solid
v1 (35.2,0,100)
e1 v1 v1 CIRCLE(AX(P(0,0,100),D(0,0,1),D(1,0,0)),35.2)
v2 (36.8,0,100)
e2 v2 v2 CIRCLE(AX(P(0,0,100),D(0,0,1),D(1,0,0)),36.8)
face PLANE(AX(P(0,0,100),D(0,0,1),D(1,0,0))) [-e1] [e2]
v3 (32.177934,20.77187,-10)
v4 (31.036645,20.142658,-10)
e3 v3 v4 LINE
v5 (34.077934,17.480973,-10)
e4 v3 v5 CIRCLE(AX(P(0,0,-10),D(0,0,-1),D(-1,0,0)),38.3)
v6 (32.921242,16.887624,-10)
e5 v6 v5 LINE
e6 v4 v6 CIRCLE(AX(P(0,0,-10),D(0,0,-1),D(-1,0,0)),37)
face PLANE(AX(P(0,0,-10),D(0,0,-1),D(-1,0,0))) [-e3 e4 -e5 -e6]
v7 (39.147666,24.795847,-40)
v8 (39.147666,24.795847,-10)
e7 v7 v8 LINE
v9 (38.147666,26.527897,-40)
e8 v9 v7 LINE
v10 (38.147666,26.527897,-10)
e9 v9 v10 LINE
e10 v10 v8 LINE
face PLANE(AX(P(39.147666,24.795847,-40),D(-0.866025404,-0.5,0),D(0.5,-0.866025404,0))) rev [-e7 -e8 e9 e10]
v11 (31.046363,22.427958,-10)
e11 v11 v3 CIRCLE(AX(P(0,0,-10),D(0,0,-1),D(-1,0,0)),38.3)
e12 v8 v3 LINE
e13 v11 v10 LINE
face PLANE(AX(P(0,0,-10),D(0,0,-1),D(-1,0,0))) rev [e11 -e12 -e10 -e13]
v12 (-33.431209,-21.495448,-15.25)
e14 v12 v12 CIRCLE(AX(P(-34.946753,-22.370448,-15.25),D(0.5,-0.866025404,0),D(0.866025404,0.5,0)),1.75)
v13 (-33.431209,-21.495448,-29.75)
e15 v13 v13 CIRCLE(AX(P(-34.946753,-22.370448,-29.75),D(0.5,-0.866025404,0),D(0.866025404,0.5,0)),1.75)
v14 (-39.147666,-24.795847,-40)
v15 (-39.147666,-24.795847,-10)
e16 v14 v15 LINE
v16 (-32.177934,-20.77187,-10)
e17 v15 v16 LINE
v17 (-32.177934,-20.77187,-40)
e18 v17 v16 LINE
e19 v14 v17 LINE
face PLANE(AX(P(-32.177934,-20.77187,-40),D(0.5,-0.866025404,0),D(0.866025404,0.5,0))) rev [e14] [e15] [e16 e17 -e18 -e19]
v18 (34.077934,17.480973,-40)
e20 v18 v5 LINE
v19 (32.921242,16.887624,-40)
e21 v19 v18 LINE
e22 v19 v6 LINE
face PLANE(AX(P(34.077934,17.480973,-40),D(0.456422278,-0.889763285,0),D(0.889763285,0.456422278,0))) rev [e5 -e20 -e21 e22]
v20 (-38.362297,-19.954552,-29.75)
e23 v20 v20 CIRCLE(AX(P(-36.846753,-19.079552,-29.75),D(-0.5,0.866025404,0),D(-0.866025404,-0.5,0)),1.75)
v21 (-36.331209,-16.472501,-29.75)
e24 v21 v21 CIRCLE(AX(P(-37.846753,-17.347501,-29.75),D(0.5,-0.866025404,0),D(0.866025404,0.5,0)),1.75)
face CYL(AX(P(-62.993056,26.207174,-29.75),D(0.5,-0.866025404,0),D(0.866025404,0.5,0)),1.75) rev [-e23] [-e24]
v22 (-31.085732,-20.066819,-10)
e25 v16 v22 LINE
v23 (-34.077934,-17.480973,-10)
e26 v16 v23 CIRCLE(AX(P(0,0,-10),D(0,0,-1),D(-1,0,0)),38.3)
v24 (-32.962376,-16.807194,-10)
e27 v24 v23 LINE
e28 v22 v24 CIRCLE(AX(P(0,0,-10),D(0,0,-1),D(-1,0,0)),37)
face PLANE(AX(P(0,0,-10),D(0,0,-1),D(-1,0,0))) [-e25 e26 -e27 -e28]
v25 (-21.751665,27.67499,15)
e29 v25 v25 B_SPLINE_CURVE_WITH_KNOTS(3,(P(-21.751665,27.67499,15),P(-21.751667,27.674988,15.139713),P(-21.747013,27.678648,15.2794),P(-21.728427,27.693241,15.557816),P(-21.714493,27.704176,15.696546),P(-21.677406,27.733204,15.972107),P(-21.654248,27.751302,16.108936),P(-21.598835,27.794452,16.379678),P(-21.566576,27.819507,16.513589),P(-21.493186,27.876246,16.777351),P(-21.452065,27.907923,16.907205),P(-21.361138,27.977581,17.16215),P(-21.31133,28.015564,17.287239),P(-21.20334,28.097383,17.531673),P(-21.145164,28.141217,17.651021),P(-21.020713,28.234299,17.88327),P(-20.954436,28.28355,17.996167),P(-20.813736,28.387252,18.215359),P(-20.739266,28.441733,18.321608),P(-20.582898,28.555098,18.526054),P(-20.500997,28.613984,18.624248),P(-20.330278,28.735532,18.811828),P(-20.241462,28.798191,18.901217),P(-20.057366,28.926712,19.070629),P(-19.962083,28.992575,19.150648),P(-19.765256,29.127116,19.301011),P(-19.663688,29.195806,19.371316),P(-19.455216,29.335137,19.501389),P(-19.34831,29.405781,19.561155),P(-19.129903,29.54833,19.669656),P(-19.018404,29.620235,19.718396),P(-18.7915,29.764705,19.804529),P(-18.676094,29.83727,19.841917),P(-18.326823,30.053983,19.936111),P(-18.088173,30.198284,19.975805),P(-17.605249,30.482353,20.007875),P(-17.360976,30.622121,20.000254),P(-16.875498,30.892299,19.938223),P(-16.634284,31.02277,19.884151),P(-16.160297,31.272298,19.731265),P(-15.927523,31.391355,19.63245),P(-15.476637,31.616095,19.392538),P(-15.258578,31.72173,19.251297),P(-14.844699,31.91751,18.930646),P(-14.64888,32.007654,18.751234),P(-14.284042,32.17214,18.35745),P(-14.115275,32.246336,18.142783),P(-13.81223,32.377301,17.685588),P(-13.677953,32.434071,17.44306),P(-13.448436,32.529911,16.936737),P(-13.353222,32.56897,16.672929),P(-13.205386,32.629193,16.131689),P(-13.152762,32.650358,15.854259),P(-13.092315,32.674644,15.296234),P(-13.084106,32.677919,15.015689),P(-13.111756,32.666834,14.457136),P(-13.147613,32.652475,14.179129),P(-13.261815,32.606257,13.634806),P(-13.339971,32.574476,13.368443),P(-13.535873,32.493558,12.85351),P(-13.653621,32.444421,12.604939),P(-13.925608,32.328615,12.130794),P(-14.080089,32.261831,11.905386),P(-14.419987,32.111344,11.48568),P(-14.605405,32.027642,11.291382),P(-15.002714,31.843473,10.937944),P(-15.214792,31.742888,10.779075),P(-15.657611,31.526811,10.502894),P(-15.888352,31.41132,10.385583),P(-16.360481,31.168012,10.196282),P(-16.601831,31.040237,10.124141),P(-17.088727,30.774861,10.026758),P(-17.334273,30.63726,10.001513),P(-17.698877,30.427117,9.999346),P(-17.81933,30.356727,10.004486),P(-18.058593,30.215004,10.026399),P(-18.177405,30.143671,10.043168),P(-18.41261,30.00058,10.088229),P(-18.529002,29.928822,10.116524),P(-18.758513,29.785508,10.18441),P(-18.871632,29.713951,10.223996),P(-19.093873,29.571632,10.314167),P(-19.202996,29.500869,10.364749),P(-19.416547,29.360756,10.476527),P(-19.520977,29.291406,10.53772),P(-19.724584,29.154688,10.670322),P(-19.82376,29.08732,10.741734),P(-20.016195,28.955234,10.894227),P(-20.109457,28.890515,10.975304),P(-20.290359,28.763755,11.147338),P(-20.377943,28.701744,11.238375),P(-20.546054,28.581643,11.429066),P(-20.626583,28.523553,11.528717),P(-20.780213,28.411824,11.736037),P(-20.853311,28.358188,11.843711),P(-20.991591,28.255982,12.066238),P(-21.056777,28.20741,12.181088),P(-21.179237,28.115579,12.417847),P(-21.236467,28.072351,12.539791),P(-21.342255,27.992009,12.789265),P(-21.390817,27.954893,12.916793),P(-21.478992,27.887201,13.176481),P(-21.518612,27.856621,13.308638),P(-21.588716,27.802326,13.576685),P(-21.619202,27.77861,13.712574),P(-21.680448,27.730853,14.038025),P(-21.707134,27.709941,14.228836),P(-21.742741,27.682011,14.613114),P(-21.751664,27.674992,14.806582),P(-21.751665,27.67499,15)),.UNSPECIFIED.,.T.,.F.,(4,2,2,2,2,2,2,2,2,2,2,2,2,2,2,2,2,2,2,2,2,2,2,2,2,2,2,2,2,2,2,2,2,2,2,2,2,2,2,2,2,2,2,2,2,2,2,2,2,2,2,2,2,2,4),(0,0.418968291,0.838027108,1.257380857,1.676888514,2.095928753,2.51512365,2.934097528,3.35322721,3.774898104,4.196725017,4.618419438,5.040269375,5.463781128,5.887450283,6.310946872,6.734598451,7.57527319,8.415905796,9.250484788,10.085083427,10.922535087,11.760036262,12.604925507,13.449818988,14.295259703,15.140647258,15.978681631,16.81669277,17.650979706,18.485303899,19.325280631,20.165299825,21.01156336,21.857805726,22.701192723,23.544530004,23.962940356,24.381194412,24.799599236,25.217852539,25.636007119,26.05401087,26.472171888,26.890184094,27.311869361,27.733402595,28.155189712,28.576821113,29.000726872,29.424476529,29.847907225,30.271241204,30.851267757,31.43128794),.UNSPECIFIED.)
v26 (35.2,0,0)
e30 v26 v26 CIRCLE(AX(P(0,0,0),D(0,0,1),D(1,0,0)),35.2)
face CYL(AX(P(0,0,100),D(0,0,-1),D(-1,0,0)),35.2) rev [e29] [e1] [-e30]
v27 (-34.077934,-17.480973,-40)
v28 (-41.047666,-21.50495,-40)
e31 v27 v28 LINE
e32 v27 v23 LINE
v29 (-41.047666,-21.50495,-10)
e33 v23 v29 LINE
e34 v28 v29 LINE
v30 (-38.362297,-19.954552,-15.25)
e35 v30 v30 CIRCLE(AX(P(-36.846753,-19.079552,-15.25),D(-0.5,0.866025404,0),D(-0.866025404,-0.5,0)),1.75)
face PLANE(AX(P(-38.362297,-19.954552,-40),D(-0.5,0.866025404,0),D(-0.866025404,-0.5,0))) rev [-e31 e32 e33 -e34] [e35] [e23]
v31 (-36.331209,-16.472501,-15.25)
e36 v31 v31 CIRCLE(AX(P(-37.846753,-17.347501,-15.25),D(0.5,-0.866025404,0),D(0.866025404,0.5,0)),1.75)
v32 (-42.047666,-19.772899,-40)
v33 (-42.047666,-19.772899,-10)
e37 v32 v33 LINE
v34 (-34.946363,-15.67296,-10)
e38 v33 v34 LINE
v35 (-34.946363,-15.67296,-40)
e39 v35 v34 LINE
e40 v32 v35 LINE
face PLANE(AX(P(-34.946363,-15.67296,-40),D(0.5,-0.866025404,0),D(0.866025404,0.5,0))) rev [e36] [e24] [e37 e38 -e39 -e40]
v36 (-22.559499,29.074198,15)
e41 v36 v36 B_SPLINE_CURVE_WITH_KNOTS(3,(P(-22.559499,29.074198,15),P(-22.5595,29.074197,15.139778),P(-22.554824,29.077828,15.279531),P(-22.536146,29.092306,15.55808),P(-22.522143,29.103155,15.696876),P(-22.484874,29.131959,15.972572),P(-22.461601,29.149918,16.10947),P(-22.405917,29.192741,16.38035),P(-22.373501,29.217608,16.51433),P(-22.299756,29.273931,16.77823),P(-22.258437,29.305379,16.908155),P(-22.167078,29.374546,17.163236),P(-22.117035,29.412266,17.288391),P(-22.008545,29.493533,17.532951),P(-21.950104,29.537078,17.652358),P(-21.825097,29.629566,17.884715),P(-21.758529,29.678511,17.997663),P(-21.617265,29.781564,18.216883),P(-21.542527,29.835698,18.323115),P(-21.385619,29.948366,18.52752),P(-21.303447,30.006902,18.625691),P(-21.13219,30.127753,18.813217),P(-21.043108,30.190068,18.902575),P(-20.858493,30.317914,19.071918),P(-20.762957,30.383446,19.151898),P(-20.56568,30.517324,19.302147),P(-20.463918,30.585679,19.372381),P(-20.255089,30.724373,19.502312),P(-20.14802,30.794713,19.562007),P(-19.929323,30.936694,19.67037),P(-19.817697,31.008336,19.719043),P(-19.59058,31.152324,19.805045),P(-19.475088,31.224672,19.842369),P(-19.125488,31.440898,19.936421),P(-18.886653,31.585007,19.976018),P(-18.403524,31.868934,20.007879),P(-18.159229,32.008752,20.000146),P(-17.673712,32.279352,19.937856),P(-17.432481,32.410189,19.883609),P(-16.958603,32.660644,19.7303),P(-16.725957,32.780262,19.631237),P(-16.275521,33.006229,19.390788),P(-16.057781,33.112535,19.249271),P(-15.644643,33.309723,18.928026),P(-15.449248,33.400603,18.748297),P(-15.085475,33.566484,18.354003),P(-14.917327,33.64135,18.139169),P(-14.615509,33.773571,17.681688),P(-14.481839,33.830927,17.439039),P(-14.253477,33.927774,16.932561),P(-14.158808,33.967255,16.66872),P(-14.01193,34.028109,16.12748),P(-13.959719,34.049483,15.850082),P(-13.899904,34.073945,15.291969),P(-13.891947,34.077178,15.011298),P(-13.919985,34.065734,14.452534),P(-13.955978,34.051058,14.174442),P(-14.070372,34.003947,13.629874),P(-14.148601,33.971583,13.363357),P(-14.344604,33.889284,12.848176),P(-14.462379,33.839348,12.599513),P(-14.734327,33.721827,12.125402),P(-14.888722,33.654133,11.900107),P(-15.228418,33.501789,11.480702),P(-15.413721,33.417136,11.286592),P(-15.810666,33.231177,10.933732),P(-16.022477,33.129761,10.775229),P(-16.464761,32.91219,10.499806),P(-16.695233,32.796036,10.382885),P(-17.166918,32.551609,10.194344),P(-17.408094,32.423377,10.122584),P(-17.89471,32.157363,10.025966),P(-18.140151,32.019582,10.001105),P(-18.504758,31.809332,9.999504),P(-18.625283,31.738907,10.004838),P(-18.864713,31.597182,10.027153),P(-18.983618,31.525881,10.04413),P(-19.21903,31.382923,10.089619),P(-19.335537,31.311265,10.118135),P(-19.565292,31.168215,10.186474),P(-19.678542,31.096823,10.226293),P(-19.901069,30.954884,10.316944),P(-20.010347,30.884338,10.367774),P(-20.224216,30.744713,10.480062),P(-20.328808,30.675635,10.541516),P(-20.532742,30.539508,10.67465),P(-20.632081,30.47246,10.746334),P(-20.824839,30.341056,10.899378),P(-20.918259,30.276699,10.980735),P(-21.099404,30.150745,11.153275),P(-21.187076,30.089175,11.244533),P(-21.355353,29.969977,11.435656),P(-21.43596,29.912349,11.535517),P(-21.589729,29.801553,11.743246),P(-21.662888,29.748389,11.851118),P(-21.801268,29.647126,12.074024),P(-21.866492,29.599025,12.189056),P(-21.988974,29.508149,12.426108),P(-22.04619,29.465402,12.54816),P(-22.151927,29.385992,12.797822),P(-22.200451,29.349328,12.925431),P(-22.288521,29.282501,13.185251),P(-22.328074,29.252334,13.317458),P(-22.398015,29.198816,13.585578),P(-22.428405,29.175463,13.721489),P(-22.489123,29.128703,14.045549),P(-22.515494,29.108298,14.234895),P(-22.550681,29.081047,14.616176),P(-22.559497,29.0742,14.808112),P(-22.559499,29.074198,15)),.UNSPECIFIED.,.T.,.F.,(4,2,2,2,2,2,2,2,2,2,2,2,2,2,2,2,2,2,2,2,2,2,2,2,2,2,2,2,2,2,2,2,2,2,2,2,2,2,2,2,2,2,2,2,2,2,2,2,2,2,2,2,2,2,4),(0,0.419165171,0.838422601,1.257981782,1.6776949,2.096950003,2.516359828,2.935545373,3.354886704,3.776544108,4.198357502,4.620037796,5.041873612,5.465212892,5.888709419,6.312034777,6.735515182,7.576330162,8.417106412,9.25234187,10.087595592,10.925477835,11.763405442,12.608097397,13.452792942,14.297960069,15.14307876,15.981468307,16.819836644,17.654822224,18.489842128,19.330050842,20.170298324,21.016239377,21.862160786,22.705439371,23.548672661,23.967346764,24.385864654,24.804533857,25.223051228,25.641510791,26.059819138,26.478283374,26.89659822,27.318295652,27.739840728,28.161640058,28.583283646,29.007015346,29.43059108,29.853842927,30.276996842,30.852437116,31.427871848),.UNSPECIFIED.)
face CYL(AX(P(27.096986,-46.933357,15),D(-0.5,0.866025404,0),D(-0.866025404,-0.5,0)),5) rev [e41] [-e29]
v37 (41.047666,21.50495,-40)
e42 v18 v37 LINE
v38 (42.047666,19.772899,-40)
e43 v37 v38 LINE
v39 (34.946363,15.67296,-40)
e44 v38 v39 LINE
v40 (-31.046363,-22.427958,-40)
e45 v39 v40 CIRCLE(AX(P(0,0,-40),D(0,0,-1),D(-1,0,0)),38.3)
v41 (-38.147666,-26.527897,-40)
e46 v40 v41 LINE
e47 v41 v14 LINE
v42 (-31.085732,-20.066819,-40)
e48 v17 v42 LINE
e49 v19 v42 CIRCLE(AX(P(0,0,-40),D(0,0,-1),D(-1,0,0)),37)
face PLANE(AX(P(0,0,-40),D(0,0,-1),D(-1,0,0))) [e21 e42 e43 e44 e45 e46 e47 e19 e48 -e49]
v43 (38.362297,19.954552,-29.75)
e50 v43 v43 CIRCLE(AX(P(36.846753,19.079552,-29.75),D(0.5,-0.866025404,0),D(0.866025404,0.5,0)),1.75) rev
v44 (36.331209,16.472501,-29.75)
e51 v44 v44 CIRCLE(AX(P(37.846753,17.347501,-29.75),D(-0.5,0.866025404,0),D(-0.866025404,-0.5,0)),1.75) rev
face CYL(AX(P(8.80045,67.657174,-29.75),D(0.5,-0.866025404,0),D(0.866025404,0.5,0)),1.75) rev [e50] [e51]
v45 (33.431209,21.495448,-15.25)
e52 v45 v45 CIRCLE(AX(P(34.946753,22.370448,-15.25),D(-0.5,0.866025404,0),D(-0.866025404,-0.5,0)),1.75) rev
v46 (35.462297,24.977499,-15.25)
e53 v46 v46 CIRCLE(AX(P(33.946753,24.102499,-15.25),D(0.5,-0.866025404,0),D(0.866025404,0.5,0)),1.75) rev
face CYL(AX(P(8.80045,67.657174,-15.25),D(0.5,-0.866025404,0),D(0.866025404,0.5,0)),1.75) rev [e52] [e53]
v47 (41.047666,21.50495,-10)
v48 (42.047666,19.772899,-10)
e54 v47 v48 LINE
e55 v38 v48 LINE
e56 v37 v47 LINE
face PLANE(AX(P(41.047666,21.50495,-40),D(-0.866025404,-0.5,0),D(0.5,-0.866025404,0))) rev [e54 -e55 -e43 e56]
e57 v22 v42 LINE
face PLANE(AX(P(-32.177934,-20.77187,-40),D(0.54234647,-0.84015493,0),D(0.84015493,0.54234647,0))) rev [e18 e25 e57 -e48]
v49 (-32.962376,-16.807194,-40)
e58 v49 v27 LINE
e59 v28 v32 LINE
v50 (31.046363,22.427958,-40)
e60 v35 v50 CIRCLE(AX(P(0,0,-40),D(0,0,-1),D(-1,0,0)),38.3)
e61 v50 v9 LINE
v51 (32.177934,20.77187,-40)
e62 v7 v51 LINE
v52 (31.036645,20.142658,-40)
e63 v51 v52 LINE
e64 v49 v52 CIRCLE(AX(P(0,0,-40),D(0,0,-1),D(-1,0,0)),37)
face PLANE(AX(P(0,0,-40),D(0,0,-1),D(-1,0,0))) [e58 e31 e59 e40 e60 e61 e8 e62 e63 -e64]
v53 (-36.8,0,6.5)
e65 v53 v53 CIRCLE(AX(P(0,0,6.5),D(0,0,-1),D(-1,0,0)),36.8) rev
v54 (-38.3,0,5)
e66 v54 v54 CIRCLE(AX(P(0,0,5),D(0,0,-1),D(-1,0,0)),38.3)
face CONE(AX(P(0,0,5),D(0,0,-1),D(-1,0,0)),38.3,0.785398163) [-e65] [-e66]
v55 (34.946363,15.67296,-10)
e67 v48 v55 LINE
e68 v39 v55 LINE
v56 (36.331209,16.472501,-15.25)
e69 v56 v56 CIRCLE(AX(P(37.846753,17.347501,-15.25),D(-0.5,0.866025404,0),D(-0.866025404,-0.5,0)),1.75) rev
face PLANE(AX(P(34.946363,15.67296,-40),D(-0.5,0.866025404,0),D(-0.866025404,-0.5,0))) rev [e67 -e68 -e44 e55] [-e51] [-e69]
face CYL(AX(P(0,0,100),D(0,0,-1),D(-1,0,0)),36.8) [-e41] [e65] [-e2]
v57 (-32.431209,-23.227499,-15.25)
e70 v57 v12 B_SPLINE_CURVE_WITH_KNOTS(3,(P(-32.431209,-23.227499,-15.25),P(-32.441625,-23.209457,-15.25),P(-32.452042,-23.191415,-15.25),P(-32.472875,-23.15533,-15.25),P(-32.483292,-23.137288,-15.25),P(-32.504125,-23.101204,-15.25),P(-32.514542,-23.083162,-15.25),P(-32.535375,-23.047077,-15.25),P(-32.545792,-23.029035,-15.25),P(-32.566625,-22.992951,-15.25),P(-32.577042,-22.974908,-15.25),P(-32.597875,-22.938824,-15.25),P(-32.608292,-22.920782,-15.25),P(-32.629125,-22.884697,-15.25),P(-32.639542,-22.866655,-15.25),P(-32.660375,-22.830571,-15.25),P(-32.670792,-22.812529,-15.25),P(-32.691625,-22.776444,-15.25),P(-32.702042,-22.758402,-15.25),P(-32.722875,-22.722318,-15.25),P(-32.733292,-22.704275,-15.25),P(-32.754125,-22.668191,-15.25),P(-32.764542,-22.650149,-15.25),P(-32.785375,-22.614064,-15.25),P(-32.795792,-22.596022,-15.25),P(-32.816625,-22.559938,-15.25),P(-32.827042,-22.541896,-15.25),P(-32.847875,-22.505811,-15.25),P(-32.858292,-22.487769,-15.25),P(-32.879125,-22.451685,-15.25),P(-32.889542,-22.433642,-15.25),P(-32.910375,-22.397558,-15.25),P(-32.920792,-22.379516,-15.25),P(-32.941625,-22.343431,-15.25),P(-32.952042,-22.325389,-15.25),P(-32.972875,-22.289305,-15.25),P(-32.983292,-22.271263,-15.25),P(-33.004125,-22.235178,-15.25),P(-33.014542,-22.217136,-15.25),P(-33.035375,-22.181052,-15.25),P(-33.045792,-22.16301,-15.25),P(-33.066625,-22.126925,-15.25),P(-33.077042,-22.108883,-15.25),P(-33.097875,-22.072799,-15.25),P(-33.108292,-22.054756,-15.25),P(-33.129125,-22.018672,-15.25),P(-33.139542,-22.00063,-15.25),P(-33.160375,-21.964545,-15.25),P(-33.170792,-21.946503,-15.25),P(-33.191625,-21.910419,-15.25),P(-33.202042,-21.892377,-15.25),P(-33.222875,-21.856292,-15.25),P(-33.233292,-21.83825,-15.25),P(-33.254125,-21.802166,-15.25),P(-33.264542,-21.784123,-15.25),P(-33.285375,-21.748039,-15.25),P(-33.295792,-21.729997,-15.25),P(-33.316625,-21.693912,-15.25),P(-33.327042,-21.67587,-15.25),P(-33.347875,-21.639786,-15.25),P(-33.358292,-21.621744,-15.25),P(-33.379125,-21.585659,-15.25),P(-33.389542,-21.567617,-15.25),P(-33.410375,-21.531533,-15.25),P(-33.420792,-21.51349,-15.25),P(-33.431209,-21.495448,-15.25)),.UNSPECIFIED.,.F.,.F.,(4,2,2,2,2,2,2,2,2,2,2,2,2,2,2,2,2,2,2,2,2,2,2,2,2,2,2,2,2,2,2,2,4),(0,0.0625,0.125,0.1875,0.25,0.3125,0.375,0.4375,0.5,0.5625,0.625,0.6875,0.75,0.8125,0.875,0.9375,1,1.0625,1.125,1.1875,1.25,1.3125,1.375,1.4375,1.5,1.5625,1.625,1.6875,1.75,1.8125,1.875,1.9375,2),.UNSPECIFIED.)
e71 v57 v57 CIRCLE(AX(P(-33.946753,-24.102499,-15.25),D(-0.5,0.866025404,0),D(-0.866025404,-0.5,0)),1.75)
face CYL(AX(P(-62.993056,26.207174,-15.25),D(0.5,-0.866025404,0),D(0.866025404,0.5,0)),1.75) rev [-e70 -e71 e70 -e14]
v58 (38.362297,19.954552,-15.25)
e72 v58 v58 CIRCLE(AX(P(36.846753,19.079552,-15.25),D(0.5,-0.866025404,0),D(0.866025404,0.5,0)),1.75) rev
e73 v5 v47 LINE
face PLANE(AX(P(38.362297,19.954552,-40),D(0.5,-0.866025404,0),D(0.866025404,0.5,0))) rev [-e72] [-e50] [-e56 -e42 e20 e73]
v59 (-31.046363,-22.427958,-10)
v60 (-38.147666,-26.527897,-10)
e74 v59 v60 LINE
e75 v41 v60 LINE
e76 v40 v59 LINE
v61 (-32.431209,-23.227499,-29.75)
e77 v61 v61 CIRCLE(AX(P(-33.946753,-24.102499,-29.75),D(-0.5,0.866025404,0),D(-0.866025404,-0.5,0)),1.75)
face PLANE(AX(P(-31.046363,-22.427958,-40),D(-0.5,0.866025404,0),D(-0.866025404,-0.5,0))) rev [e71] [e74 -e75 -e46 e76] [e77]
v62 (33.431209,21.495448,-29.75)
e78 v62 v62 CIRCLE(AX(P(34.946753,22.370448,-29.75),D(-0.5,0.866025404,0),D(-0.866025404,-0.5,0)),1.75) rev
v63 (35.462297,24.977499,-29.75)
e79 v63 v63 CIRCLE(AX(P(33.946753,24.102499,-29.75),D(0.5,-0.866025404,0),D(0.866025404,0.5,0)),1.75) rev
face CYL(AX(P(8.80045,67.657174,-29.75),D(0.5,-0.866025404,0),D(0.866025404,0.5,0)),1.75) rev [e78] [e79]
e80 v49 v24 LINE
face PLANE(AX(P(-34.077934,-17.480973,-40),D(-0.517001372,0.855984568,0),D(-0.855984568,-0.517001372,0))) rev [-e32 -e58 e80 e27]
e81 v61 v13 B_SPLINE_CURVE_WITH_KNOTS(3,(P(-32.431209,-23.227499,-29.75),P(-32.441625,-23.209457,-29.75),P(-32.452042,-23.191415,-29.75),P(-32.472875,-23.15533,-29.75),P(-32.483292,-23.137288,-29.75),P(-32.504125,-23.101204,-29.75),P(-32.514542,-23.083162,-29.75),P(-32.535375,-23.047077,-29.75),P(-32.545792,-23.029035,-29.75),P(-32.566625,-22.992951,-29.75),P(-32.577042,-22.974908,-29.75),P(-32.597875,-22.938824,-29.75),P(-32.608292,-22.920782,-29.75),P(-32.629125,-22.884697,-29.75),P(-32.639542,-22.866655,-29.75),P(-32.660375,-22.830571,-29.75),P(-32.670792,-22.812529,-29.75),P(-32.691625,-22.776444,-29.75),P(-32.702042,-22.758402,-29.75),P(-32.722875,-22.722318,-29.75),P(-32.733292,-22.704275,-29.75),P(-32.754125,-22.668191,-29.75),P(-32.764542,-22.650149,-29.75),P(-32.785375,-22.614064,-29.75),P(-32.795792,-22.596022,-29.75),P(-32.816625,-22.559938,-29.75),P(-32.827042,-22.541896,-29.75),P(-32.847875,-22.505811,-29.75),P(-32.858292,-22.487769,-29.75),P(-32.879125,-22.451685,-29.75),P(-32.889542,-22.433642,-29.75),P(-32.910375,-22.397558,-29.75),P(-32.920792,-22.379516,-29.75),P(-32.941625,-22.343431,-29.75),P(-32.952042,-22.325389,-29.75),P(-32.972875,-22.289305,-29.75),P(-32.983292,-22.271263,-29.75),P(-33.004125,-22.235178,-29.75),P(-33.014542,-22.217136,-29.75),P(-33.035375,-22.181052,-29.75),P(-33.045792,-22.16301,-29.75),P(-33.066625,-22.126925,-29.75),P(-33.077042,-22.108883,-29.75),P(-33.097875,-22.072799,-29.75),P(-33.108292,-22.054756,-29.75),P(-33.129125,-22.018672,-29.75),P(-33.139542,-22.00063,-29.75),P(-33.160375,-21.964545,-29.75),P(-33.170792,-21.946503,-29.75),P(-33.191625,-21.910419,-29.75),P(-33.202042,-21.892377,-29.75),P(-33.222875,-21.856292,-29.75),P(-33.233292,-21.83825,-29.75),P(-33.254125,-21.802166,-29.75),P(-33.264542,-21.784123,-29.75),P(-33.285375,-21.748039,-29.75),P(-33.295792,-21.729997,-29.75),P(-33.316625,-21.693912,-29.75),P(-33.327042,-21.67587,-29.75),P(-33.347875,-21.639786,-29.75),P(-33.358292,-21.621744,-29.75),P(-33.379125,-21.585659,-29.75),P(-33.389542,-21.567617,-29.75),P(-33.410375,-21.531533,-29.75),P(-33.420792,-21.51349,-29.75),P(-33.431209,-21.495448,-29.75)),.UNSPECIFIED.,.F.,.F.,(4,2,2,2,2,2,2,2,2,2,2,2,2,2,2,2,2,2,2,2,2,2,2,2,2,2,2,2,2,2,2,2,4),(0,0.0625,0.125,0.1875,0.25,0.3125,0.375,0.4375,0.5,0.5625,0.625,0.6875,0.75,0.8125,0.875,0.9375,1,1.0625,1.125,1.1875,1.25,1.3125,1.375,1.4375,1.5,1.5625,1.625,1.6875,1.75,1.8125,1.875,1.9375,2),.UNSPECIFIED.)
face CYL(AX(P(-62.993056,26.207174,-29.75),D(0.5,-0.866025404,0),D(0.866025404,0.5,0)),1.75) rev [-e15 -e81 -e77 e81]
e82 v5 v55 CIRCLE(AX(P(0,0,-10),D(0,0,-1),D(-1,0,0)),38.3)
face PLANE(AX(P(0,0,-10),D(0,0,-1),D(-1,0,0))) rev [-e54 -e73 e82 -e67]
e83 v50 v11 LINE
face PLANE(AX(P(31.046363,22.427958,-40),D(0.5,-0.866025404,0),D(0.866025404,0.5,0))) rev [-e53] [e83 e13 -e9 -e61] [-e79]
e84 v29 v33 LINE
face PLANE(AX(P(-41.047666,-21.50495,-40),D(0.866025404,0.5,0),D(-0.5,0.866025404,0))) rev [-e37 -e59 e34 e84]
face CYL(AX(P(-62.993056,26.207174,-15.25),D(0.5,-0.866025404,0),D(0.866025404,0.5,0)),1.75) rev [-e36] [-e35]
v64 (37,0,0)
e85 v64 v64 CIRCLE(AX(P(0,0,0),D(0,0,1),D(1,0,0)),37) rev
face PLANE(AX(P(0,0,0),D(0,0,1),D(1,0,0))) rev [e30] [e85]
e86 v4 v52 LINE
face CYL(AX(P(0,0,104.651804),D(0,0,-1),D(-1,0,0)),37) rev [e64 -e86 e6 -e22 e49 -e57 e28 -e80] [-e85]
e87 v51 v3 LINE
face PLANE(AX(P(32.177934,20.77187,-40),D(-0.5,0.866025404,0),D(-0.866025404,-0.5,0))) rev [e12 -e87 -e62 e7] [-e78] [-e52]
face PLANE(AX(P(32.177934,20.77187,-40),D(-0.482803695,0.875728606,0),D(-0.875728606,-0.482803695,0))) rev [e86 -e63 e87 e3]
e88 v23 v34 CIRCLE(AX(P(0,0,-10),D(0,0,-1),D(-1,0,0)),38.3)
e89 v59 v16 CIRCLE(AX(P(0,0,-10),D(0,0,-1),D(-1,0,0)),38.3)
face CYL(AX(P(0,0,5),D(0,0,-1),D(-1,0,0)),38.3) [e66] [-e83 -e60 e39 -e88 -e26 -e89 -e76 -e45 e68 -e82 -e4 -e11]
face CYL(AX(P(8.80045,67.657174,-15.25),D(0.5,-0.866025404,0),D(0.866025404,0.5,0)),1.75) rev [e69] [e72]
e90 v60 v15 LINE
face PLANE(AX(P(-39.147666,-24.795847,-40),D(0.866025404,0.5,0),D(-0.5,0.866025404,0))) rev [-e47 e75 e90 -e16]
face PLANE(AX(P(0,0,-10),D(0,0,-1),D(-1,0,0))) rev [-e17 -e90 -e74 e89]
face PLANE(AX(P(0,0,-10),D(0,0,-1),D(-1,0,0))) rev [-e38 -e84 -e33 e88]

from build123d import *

# Parameters (mm, degrees)
SKETCH1_R                = 36.8
SKETCH1_R_2              = 35.2
BOSS_EXTRUDE1_DEPTH      = 100
BOSS_EXTRUDE2_DEPTH      = 10
BOSS_EXTRUDE2_DEPTH_BACK = 5
SKETCH2_R                = 38.3
SKETCH2_R_2              = 36.8
CHAMFER1_SIZE            = 1.5
BOSS_EXTRUDE3_START      = 30
BOSS_EXTRUDE3_DEPTH      = 30
SKETCH7_R                = 1.75
CUT_EXTRUDE1_DEPTH       = 116.043019012
CUT_EXTRUDE2_REACH       = 153.112
CUT_EXTRUDE3_REACH       = 138.3
CUT_EXTRUDE3_END_RADIUS  = 35.2
SKETCH9_R                = 5


with BuildPart() as part:
    # Sketch1 → Boss-Extrude1 (new body)
    with BuildSketch(Plane.XY):
        Circle(SKETCH1_R)
        Circle(SKETCH1_R_2, mode=Mode.SUBTRACT)
    extrude(amount=BOSS_EXTRUDE1_DEPTH)

    # Sketch2 → Boss-Extrude2 (add, two sides: drawn at the far end of the back side and taken through both)
    with BuildSketch(Plane(origin=(0, 0, 0), x_dir=(-1, 0, 0), z_dir=(0, 0, -1)).offset(-BOSS_EXTRUDE2_DEPTH_BACK)):
        Circle(SKETCH2_R)
        Circle(SKETCH2_R_2, mode=Mode.SUBTRACT)
    extrude(amount=BOSS_EXTRUDE2_DEPTH + BOSS_EXTRUDE2_DEPTH_BACK)

    # Chamfer1
    chamfer1_edges = [part.edges().sort_by_distance(p)[0] for p in [
        (-36.8, 0, 5),
    ]]
    chamfer(chamfer1_edges, length=CHAMFER1_SIZE - 0.0001)  # a hair under: the kernel refuses the full size

    # Sketch6 → Boss-Extrude3 (add)
    with BuildSketch(Plane(origin=(0, 0, -10), x_dir=(-1, 0, 0), z_dir=(0, 0, -1)).offset(BOSS_EXTRUDE3_START)):
        with BuildLine():
            Line((-31.046363436, 22.427958387), (-32.43120853, 23.227499075))
            Line((-32.43120853, 23.227499075), (-35.462297443, 24.977499075))
            Line((-35.462297443, 24.977499075), (-38.147666087, 26.527897384))
            Line((-38.147666087, 26.527897384), (-39.147666087, 24.795846576))
            Line((-39.147666087, 24.795846576), (-36.462297443, 23.245448267))
            Line((-36.462297443, 23.245448267), (-33.43120853, 21.495448267))
            Line((-33.43120853, 21.495448267), (-32.177933832, 20.771869783))
            Line((-32.177933832, 20.771869783), (-30.861043972, 20.045846576))
            ThreePointArc((-30.861043972, 20.045846576), (18.4, 31.869734859), (32.790734361, -16.703524779))
            Line((32.790734361, -16.703524779), (34.077933832, -17.480973249))
            Line((34.077933832, -17.480973249), (35.33120853, -18.204551733))
            Line((35.33120853, -18.204551733), (38.362297443, -19.954551733))
            Line((38.362297443, -19.954551733), (41.047666087, -21.504950042))
            Line((41.047666087, -21.504950042), (42.047666087, -19.772899234))
            Line((42.047666087, -19.772899234), (39.362297443, -18.222500925))
            Line((39.362297443, -18.222500925), (36.33120853, -16.472500925))
            Line((36.33120853, -16.472500925), (34.946363436, -15.672960237))
            ThreePointArc((34.946363436, -15.672960237), (19.15, 33.168772965), (-31.046363436, 22.427958387))
        make_face()
        with BuildLine():
            Line((-34.946363436, 15.672960237), (-36.33120853, 16.472500925))
            Line((-36.33120853, 16.472500925), (-39.362297443, 18.222500925))
            Line((-39.362297443, 18.222500925), (-42.047666087, 19.772899234))
            Line((-42.047666087, 19.772899234), (-41.047666087, 21.504950042))
            Line((-41.047666087, 21.504950042), (-38.362297443, 19.954551733))
            Line((-38.362297443, 19.954551733), (-35.33120853, 18.204551733))
            Line((-35.33120853, 18.204551733), (-34.077933832, 17.480973249))
            Line((-34.077933832, 17.480973249), (-32.743288904, 16.796339832))
            ThreePointArc((-32.743288904, 16.796339832), (-18.4, -31.869734859), (30.917701437, -19.958350079))
            Line((30.917701437, -19.958350079), (32.177933832, -20.771869783))
            Line((32.177933832, -20.771869783), (33.43120853, -21.495448267))
            Line((33.43120853, -21.495448267), (36.462297443, -23.245448267))
            Line((36.462297443, -23.245448267), (39.147666087, -24.795846576))
            Line((39.147666087, -24.795846576), (38.147666087, -26.527897384))
            Line((38.147666087, -26.527897384), (35.462297443, -24.977499075))
            Line((35.462297443, -24.977499075), (32.43120853, -23.227499075))
            Line((32.43120853, -23.227499075), (31.046363436, -22.427958387))
            ThreePointArc((31.046363436, -22.427958387), (-19.15, -33.168772965), (-34.946363436, 15.672960237))
        make_face()
    extrude(amount=-BOSS_EXTRUDE3_DEPTH)

    # Sketch7 → Cut-Extrude1 (cut, symmetric)
    with BuildSketch(Plane(origin=(0, 0, 0), x_dir=(0, 0, 1), z_dir=(0.500000000000001, -0.866025403784438, 0))):
        with Locations(Location((-29.75, 41.45, 0), (0, 0, 270))):
            Circle(SKETCH7_R)
        with Locations(Location((-15.25, 41.45, 0), (0, 0, 270))):
            Circle(SKETCH7_R)
    cut_extrude1 = extrude(amount=CUT_EXTRUDE1_DEPTH, both=True, mode=Mode.SUBTRACT)

    # Mirror1: Cut-Extrude1 across plane
    add(cut_extrude1.mirror(Plane(origin=(0, 0, 0), x_dir=(0, 0, 1), z_dir=(0.866025403784438, 0.500000000000001, 0))), mode=Mode.SUBTRACT)

    # Cut-Extrude2: up to this face of the body (flat: up to its plane)
    cut_extrude2_end = Plane(part.part.faces().sort_by_distance((35.759138818, 0, 0))[0])
    # Sketch8 → Cut-Extrude2 (cut, up to the picked face)
    with BuildSketch(Plane(origin=(0, 0, -40), x_dir=(-1, 0, 0), z_dir=(0, 0, -1)), mode=Mode.PRIVATE) as cut_extrude2_sk1:
        with BuildLine():
            ThreePointArc((31.085732423, -20.066819373), (32.069109105, -18.454599459), (32.968944874, -16.794304805))
            ThreePointArc((32.968944874, -16.794304805), (18.5, 32.04293994), (-31.028767037, 20.154791395))
            ThreePointArc((-31.028767037, 20.154791395), (-32.016706501, 18.545363432), (-32.921241561, 16.887624287))
            ThreePointArc((-32.921241561, 16.887624287), (-18.5, -32.04293994), (31.085732423, -20.066819373))
        make_face()
    cut_extrude2_tool1 = split(extrude(cut_extrude2_sk1.sketch, amount=-CUT_EXTRUDE2_REACH, mode=Mode.PRIVATE), bisect_by=cut_extrude2_end, keep=Keep.BOTH, mode=Mode.PRIVATE)
    add(cut_extrude2_tool1.solids().sort_by(Axis((0, 0, -40), (0, 0, 1)))[0], mode=Mode.SUBTRACT)

    # Cut-Extrude3: up to this cylinder (the profile starts outside it)
    cut_extrude3_end = Plane(origin=(0, 0, 15), z_dir=(0, 0, -1)) * Cylinder(CUT_EXTRUDE3_END_RADIUS, 348, mode=Mode.PRIVATE)
    # Sketch9 → Cut-Extrude3 (cut, up to the surface)
    with BuildSketch(Plane(origin=(-18.4, 31.869734859, 0), x_dir=(0.8660254037844382, 0.500000000000001, 0), z_dir=(-0.500000000000001, 0.8660254037844382, 0)), mode=Mode.PRIVATE) as cut_extrude3_sk1:
        with Locations(Location((0, -15, 0), (0, 0, 180))):
            Circle(SKETCH9_R)
    cut_extrude3_tool1 = extrude(cut_extrude3_sk1.sketch, amount=-CUT_EXTRUDE3_REACH, mode=Mode.PRIVATE) - cut_extrude3_end
    add(cut_extrude3_tool1.solids().sort_by_distance((-18.4, 31.869735, 15))[0], mode=Mode.SUBTRACT)


solid = part.part
